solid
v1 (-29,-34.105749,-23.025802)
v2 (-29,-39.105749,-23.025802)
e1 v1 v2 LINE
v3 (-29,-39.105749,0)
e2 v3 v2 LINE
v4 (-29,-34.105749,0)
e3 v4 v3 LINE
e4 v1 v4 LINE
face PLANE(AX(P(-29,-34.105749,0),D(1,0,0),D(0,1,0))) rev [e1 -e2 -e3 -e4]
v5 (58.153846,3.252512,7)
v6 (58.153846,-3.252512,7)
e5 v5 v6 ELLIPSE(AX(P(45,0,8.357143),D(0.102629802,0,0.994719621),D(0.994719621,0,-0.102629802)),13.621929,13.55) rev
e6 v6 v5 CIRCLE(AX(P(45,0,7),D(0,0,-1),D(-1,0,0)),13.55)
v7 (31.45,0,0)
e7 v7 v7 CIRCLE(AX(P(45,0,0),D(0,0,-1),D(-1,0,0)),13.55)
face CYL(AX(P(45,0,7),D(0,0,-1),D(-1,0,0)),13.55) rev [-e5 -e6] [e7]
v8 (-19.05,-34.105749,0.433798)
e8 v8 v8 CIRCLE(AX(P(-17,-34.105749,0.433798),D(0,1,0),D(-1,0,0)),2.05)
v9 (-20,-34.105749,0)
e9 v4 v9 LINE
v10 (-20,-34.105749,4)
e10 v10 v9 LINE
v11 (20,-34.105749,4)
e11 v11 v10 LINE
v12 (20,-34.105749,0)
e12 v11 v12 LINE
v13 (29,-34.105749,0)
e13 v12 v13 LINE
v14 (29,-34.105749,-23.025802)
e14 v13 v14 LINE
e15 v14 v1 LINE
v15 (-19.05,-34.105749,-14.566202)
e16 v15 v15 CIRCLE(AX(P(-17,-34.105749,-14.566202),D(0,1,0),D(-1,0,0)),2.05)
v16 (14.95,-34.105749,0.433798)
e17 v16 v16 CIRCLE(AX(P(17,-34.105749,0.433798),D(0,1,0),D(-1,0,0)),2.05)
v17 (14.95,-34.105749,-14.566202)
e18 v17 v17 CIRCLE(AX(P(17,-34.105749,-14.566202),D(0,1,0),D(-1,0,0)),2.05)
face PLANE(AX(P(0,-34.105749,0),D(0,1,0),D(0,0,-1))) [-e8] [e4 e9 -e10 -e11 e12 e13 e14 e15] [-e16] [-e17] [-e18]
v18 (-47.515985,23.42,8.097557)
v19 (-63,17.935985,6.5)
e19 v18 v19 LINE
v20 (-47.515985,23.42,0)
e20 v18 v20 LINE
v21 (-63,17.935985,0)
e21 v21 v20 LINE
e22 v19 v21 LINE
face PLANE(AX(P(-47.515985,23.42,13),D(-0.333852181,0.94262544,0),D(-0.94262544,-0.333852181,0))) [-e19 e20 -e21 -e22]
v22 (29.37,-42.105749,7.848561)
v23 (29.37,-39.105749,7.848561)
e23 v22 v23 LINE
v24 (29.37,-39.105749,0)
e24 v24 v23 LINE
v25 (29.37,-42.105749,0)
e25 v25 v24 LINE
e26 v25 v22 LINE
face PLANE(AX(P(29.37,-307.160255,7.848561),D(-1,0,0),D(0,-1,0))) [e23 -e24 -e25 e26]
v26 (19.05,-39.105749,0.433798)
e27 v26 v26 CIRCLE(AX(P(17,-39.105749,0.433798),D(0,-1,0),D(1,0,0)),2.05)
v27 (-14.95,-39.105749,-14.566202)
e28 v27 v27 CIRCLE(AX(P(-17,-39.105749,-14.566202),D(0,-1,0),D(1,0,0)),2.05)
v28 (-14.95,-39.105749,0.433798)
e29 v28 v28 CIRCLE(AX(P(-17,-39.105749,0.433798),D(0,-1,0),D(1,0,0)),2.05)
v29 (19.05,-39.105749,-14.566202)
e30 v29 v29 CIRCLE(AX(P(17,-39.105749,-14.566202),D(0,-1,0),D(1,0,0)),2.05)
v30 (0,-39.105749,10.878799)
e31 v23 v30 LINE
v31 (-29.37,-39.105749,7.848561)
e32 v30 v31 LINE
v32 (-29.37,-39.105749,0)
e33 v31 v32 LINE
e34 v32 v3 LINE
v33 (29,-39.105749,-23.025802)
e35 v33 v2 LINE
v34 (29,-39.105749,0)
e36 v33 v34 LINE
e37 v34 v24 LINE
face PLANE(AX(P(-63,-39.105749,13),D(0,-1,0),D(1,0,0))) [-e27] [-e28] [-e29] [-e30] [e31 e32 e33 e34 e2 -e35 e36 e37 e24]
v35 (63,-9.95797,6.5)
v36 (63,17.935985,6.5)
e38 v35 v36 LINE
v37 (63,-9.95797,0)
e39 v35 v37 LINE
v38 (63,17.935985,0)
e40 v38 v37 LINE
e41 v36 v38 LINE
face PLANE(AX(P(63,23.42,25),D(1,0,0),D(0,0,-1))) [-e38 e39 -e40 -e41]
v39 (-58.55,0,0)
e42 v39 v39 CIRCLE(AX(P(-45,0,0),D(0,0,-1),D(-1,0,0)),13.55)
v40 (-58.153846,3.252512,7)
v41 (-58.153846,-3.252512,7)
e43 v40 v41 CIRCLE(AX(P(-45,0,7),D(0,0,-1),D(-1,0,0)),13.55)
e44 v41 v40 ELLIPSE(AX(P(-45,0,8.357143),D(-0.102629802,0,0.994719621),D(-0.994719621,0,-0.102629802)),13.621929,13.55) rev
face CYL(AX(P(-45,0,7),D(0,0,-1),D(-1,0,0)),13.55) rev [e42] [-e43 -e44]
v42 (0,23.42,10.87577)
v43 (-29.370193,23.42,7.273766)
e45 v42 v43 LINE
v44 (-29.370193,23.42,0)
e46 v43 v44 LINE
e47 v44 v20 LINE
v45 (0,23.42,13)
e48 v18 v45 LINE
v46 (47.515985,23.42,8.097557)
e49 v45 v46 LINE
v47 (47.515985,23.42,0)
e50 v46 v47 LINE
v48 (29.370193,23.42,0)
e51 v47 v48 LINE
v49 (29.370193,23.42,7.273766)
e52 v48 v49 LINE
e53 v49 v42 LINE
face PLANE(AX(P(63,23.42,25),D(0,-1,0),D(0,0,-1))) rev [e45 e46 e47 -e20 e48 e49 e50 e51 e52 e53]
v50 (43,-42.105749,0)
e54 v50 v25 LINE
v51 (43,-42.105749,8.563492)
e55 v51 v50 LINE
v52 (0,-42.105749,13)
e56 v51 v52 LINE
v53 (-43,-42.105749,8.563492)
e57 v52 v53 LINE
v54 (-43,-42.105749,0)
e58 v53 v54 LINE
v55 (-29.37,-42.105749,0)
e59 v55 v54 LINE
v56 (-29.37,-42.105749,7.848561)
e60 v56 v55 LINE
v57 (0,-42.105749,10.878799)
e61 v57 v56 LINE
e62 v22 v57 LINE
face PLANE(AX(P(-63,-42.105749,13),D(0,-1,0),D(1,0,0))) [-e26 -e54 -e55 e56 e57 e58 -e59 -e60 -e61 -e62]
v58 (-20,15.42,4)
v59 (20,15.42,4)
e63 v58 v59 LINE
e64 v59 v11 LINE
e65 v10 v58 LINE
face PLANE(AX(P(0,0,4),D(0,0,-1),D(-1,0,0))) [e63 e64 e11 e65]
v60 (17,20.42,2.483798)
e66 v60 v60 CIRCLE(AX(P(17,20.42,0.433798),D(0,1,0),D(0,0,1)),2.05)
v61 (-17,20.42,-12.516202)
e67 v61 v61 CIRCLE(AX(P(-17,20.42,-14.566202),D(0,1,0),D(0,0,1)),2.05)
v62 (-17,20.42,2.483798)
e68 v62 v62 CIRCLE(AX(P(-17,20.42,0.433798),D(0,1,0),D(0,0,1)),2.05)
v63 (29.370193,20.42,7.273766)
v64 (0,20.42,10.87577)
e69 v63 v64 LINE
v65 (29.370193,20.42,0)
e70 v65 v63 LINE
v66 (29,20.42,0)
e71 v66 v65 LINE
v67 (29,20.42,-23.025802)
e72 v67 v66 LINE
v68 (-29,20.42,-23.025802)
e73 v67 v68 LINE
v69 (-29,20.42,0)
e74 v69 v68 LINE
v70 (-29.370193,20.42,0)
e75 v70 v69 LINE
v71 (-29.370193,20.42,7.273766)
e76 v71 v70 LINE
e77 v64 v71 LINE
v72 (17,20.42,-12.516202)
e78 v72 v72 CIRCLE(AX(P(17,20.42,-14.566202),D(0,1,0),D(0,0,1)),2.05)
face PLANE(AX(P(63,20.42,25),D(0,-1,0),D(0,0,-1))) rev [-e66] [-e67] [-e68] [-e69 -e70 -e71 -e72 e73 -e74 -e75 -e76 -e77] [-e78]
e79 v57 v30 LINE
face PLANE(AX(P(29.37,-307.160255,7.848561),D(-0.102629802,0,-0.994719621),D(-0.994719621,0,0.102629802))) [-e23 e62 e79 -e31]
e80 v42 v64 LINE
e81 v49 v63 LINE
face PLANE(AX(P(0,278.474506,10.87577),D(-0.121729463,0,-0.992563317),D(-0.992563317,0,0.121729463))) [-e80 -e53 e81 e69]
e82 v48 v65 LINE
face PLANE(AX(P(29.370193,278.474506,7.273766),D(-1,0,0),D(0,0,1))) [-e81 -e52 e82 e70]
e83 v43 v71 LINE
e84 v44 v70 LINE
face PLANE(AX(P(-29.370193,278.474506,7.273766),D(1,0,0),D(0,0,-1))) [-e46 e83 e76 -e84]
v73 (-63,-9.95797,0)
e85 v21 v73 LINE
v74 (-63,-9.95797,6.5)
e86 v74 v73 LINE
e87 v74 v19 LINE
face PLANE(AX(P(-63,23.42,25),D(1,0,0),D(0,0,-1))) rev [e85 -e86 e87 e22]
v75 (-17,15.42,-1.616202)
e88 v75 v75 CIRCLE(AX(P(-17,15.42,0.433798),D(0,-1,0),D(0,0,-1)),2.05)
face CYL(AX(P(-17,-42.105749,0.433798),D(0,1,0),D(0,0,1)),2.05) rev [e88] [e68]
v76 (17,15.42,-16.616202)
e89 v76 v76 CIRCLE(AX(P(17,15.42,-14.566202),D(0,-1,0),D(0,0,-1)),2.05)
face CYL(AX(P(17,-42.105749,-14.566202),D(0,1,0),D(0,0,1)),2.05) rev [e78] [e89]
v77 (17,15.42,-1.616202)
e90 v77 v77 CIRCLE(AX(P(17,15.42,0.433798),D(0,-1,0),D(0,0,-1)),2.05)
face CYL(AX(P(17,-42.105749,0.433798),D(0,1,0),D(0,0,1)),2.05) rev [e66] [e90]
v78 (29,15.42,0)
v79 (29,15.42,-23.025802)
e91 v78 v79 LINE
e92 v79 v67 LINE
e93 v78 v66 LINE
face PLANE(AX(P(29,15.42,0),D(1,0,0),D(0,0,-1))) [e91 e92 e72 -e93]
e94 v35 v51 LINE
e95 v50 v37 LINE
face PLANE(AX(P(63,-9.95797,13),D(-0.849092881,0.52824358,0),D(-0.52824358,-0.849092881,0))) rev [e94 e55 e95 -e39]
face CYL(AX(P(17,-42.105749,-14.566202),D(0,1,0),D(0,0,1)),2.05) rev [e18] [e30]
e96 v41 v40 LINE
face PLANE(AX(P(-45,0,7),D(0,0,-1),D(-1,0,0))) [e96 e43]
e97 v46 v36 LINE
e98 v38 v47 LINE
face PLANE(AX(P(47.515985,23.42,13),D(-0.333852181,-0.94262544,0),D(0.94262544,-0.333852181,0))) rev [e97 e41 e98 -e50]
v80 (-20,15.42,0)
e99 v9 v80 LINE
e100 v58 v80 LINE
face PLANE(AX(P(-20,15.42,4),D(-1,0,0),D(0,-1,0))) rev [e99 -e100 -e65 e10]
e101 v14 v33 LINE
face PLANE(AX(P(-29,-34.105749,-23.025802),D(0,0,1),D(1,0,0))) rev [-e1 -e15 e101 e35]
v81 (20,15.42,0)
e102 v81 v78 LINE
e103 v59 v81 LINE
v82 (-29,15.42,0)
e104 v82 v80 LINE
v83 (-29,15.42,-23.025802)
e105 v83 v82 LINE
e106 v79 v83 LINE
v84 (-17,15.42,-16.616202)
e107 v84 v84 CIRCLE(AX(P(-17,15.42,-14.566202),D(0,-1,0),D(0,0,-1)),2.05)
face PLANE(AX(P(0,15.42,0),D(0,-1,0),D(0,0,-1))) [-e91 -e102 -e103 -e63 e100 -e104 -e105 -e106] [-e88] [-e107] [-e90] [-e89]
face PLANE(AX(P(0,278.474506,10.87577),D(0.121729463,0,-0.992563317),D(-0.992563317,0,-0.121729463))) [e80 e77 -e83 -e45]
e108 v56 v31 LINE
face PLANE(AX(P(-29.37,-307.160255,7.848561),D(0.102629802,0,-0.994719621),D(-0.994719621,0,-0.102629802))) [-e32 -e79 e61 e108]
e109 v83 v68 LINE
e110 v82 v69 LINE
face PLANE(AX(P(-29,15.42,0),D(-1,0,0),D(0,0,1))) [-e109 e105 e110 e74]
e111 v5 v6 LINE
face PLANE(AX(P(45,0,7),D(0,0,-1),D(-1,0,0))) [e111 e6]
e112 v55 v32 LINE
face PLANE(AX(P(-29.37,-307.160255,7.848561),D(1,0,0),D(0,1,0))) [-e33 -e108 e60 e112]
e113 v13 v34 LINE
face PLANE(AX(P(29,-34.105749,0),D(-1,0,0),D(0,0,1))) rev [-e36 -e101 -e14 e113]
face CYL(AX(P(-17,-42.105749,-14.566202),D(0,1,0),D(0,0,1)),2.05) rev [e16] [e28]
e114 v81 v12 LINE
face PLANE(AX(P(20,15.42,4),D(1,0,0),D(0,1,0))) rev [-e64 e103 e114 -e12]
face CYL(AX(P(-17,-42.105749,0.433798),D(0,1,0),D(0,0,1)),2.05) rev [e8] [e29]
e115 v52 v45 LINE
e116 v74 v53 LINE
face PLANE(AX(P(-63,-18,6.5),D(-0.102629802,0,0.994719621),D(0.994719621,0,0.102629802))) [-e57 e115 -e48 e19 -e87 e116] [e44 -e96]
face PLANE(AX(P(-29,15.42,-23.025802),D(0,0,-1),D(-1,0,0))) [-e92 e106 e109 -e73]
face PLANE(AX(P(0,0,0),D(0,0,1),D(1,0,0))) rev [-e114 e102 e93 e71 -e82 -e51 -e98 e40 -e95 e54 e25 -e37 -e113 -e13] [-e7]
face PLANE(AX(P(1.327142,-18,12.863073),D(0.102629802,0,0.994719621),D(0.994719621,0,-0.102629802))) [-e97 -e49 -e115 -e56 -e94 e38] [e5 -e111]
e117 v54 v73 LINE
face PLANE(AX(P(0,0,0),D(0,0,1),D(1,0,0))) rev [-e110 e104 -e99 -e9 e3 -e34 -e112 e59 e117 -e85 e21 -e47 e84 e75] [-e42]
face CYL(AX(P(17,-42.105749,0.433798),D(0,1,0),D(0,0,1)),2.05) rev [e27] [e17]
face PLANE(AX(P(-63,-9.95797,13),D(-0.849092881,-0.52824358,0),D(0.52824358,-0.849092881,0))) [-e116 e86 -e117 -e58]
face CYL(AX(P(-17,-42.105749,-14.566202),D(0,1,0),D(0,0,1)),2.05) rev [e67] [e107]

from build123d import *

# Parameters (mm, degrees)
SKETCH1_W                = 200
SKETCH1_H                = 60
BOSS_EXTRUDE1_DEPTH      = 25
SKETCH3_R                = 13.55
CUT_EXTRUDE1_DEPTH       = 7
CUT_EXTRUDE3_DEPTH       = 108.354552768
CUT_EXTRUDE7_DEPTH       = 45
FILLET8_R                = 5
SKETCH13_W               = 227.671202294
SKETCH13_H               = 68.392794906
SKETCH13_W_2             = 126
SKETCH13_H_2             = 41.42
CUT_EXTRUDE8_DEPTH       = 108.354552768
SKETCH14_W               = 12
SKETCH14_H               = 41.42
CUT_EXTRUDE9_DEPTH       = 131.573720174
CUT_EXTRUDE10_DEPTH      = 77.508930198
SKETCH19_W               = 126
SKETCH19_H               = 24.105748896
BOSS_EXTRUDE2_DEPTH      = 13
CUT_EXTRUDE11_DEPTH      = 77.508930198
CUT_EXTRUDE12_DEPTH      = 13
SKETCH22_W               = 58
SKETCH22_H               = 23.025801555
BOSS_EXTRUDE3_DEPTH      = 8
SKETCH24_W               = 40
SKETCH24_H               = 49.525748896
CUT_EXTRUDE13_DEPTH      = 4
CUT_EXTRUDE14_START      = -3
CUT_EXTRUDE14_DEPTH      = 3
CUT_EXTRUDE15_DEPTH      = 94.769991499
CUT_EXTRUDE15_DEPTH_BACK = 3
SKETCH27_R               = 2.05
CUT_EXTRUDE16_DEPTH      = 92.698728521


# Read off the part's stored shape, not the designer's step: Cut-Extrude14
with BuildPart() as part:
    # Sketch1 → Boss-Extrude1 (new body)
    with BuildSketch(Plane.XY):
        Rectangle(SKETCH1_W, SKETCH1_H)
    extrude(amount=BOSS_EXTRUDE1_DEPTH)

    # Sketch3 → Cut-Extrude1 (cut)
    with BuildSketch(Plane(origin=(0, 0, 0), x_dir=(-1, 0, 0), z_dir=(0, 0, -1))):
        with Locations((-45, 0)):
            Circle(SKETCH3_R)
        with Locations((45, 0)):
            Circle(SKETCH3_R)
    extrude(amount=-CUT_EXTRUDE1_DEPTH, mode=Mode.SUBTRACT)

    # Sketch6 → Cut-Extrude3 (cut, through all)
    with BuildSketch(Plane(origin=(0, 0, 0), x_dir=(-1, 0, 0), z_dir=(0, 0, -1))):
        Polygon((-100, 15.531551678), (-87.020750536, 30), (-100, 30), align=None)
        Polygon((-89.003501814, -30), (-100, -15.090940283), (-100, -30), align=None)
        Polygon((100, -30), (100, -15.090940283), (89.003501814, -30), align=None)
        Polygon((100, 30), (87.020750536, 30), (100, 15.531551678), align=None)
    extrude(amount=-CUT_EXTRUDE3_DEPTH, mode=Mode.SUBTRACT)

    # Sketch11 → Cut-Extrude7 (cut)
    with BuildSketch(Plane(origin=(0, 0, 0), x_dir=(-1, 0, 0), z_dir=(0, 0, -1))):
        Polygon((8.001444911, 30), (-99.028209758, 30), (-99.028209758, 24.58), (8.001444911, 24.58), (98.384596387, 24.58), (98.384596387, 30), align=None)
    extrude(amount=-CUT_EXTRUDE7_DEPTH, mode=Mode.SUBTRACT)

    # Fillet8
    fillet8_edges = [part.edges().sort_by_distance(p)[0] for p in [
        (100, 0.220305698, 25),
        (-100, 0.220305698, 25),
        (0, -30, 25),
        (-94.501750907, -22.545470141, 25),
        (94.501750907, -22.545470141, 25),
        (-95.941442184, 20.055775839, 25),
        (95.941442184, 20.055775839, 25),
        (0, 24.58, 25),
    ]]
    fillet(fillet8_edges, radius=FILLET8_R)

    # Sketch13 → Cut-Extrude8 (cut, through all)
    with BuildSketch(Plane(origin=(0, 0, 0), x_dir=(-1, 0, 0), z_dir=(0, 0, -1))):
        with Locations((1.665204381, -2.689234518)):
            Rectangle(SKETCH13_W, SKETCH13_H)
        with Locations((0, 2.71)):
            Rectangle(SKETCH13_W_2, SKETCH13_H_2, mode=Mode.SUBTRACT)
    extrude(amount=-CUT_EXTRUDE8_DEPTH, mode=Mode.SUBTRACT)

    # Sketch14 → Cut-Extrude9 (cut, through all)
    with BuildSketch(Plane(origin=(63, 0, 0), x_dir=(0, 0, -1), z_dir=(1, 0, 0))):
        with Locations((-19, 2.71)):
            Rectangle(SKETCH14_W, SKETCH14_H)
    extrude(amount=-CUT_EXTRUDE9_DEPTH, mode=Mode.SUBTRACT)

    # Sketch15 → Cut-Extrude10 (cut, through all)
    with BuildSketch(Plane(origin=(0, 23.42, 0), x_dir=(1, 0, 0), z_dir=(0, 1, 0))):
        Polygon((63, -6.5), (0, -13), (63, -13), align=None)
        Polygon((-63, -6.5), (0, -13), (-63, -13), align=None)
    extrude(amount=-CUT_EXTRUDE10_DEPTH, mode=Mode.SUBTRACT)

    # Sketch19 → Boss-Extrude2 (add)
    with BuildSketch(Plane(origin=(0, 0, 0), x_dir=(-1, 0, 0), z_dir=(0, 0, -1))):
        with Locations((0, -30.052874448)):
            Rectangle(SKETCH19_W, SKETCH19_H)
    extrude(amount=-BOSS_EXTRUDE2_DEPTH)

    # Sketch20 → Cut-Extrude11 (cut, through all)
    with BuildSketch(Plane(origin=(0, -18, 0), x_dir=(1, 0, 0), z_dir=(0, 1, 0))):
        Polygon((-63, -6.5), (-63, -13), (63, -13), (63, -6.5), (0, -13), align=None)
    extrude(amount=-CUT_EXTRUDE11_DEPTH, mode=Mode.SUBTRACT)

    # Sketch21 → Cut-Extrude12 (cut)
    with BuildSketch(Plane(origin=(0, 0, 0), x_dir=(-1, 0, 0), z_dir=(0, 0, -1))):
        Polygon((-63, -9.957970409), (-43, -42.105748896), (-63, -42.105748896), align=None)
        Polygon((-47.515984788, 23.42), (-63, 17.935984788), (-63, 23.42), align=None)
    cut_extrude12 = extrude(amount=-CUT_EXTRUDE12_DEPTH, mode=Mode.SUBTRACT)

    # Mirror1: Cut-Extrude12 across plane
    add(cut_extrude12.mirror(Plane(origin=(0, 0, 0), x_dir=(0, 0, 1), z_dir=(1, 0, 0))), mode=Mode.SUBTRACT)

    # Sketch22 → Boss-Extrude3 (add)
    with BuildSketch(Plane(origin=(0, 23.42, 0), x_dir=(1, 0, 0), z_dir=(0, 1, 0))):
        with Locations((0, 11.512900778)):
            Rectangle(SKETCH22_W, SKETCH22_H)
    boss_extrude3 = extrude(amount=-BOSS_EXTRUDE3_DEPTH)

    # Mirror2: Boss-Extrude3 across plane
    add(boss_extrude3.mirror(Plane(origin=(0, -9.342874448, 0), x_dir=(0, 0, 1), z_dir=(0, -1, 0))))

    # Sketch24 → Cut-Extrude13 (cut)
    with BuildSketch(Plane(origin=(0, 0, 0), x_dir=(-1, 0, 0), z_dir=(0, 0, -1))):
        with Locations((0, -9.342874448)):
            Rectangle(SKETCH24_W, SKETCH24_H)
    extrude(amount=-CUT_EXTRUDE13_DEPTH, mode=Mode.SUBTRACT)

    # Cut-Extrude14 outline → Cut-Extrude14 (cut)
    with BuildSketch(Plane(origin=(0, 23.42, 0), x_dir=(1, 0, 0), z_dir=(0, 1, 0)).offset(CUT_EXTRUDE14_START)):
        Polygon((29.370193256, -7.27376555), (29.370193256, 0), (29, 0), (29, 23.025801555), (-29, 23.025801555), (-29, 0), (-29.370193256, 0), (-29.370193256, -7.27376555), (0, -10.875770383), align=None)
    extrude(amount=CUT_EXTRUDE14_DEPTH, mode=Mode.SUBTRACT)

    # Sketch26 → Cut-Extrude15 (cut, two sides: drawn at the far end of the back side and taken through both)
    with BuildSketch(Plane.XZ.offset(42.105748896).offset(-CUT_EXTRUDE15_DEPTH_BACK)):
        Polygon((29, -230.630036101), (29, -23.025801555), (29, 0), (29.37, 0), (29.37, 7.84856116), (0, 10.878799255), (-29.37, 7.84856116), (-29.37, 0), (-29, 0), (-29, -23.025801555), (-29, -230.630036101), (-29, -645.838505193), (29, -645.838505193), align=None)
    extrude(amount=CUT_EXTRUDE15_DEPTH + CUT_EXTRUDE15_DEPTH_BACK, mode=Mode.SUBTRACT)

    # Sketch27 → Cut-Extrude16 (cut, through all)
    with BuildSketch(Plane(origin=(0, 20.42, 0), x_dir=(1, 0, 0), z_dir=(0, 1, 0))):
        with Locations(Location((17, -0.433798275, 0), (0, 0, 180))):
            Circle(SKETCH27_R)
        with Locations(Location((-17, -0.433798275, 0), (0, 0, 180))):
            Circle(SKETCH27_R)
        with Locations(Location((-17, 14.566201725, 0), (0, 0, 180))):
            Circle(SKETCH27_R)
        with Locations(Location((17, 14.566201725, 0), (0, 0, 180))):
            Circle(SKETCH27_R)
    extrude(amount=-CUT_EXTRUDE16_DEPTH, mode=Mode.SUBTRACT)


solid = part.part
